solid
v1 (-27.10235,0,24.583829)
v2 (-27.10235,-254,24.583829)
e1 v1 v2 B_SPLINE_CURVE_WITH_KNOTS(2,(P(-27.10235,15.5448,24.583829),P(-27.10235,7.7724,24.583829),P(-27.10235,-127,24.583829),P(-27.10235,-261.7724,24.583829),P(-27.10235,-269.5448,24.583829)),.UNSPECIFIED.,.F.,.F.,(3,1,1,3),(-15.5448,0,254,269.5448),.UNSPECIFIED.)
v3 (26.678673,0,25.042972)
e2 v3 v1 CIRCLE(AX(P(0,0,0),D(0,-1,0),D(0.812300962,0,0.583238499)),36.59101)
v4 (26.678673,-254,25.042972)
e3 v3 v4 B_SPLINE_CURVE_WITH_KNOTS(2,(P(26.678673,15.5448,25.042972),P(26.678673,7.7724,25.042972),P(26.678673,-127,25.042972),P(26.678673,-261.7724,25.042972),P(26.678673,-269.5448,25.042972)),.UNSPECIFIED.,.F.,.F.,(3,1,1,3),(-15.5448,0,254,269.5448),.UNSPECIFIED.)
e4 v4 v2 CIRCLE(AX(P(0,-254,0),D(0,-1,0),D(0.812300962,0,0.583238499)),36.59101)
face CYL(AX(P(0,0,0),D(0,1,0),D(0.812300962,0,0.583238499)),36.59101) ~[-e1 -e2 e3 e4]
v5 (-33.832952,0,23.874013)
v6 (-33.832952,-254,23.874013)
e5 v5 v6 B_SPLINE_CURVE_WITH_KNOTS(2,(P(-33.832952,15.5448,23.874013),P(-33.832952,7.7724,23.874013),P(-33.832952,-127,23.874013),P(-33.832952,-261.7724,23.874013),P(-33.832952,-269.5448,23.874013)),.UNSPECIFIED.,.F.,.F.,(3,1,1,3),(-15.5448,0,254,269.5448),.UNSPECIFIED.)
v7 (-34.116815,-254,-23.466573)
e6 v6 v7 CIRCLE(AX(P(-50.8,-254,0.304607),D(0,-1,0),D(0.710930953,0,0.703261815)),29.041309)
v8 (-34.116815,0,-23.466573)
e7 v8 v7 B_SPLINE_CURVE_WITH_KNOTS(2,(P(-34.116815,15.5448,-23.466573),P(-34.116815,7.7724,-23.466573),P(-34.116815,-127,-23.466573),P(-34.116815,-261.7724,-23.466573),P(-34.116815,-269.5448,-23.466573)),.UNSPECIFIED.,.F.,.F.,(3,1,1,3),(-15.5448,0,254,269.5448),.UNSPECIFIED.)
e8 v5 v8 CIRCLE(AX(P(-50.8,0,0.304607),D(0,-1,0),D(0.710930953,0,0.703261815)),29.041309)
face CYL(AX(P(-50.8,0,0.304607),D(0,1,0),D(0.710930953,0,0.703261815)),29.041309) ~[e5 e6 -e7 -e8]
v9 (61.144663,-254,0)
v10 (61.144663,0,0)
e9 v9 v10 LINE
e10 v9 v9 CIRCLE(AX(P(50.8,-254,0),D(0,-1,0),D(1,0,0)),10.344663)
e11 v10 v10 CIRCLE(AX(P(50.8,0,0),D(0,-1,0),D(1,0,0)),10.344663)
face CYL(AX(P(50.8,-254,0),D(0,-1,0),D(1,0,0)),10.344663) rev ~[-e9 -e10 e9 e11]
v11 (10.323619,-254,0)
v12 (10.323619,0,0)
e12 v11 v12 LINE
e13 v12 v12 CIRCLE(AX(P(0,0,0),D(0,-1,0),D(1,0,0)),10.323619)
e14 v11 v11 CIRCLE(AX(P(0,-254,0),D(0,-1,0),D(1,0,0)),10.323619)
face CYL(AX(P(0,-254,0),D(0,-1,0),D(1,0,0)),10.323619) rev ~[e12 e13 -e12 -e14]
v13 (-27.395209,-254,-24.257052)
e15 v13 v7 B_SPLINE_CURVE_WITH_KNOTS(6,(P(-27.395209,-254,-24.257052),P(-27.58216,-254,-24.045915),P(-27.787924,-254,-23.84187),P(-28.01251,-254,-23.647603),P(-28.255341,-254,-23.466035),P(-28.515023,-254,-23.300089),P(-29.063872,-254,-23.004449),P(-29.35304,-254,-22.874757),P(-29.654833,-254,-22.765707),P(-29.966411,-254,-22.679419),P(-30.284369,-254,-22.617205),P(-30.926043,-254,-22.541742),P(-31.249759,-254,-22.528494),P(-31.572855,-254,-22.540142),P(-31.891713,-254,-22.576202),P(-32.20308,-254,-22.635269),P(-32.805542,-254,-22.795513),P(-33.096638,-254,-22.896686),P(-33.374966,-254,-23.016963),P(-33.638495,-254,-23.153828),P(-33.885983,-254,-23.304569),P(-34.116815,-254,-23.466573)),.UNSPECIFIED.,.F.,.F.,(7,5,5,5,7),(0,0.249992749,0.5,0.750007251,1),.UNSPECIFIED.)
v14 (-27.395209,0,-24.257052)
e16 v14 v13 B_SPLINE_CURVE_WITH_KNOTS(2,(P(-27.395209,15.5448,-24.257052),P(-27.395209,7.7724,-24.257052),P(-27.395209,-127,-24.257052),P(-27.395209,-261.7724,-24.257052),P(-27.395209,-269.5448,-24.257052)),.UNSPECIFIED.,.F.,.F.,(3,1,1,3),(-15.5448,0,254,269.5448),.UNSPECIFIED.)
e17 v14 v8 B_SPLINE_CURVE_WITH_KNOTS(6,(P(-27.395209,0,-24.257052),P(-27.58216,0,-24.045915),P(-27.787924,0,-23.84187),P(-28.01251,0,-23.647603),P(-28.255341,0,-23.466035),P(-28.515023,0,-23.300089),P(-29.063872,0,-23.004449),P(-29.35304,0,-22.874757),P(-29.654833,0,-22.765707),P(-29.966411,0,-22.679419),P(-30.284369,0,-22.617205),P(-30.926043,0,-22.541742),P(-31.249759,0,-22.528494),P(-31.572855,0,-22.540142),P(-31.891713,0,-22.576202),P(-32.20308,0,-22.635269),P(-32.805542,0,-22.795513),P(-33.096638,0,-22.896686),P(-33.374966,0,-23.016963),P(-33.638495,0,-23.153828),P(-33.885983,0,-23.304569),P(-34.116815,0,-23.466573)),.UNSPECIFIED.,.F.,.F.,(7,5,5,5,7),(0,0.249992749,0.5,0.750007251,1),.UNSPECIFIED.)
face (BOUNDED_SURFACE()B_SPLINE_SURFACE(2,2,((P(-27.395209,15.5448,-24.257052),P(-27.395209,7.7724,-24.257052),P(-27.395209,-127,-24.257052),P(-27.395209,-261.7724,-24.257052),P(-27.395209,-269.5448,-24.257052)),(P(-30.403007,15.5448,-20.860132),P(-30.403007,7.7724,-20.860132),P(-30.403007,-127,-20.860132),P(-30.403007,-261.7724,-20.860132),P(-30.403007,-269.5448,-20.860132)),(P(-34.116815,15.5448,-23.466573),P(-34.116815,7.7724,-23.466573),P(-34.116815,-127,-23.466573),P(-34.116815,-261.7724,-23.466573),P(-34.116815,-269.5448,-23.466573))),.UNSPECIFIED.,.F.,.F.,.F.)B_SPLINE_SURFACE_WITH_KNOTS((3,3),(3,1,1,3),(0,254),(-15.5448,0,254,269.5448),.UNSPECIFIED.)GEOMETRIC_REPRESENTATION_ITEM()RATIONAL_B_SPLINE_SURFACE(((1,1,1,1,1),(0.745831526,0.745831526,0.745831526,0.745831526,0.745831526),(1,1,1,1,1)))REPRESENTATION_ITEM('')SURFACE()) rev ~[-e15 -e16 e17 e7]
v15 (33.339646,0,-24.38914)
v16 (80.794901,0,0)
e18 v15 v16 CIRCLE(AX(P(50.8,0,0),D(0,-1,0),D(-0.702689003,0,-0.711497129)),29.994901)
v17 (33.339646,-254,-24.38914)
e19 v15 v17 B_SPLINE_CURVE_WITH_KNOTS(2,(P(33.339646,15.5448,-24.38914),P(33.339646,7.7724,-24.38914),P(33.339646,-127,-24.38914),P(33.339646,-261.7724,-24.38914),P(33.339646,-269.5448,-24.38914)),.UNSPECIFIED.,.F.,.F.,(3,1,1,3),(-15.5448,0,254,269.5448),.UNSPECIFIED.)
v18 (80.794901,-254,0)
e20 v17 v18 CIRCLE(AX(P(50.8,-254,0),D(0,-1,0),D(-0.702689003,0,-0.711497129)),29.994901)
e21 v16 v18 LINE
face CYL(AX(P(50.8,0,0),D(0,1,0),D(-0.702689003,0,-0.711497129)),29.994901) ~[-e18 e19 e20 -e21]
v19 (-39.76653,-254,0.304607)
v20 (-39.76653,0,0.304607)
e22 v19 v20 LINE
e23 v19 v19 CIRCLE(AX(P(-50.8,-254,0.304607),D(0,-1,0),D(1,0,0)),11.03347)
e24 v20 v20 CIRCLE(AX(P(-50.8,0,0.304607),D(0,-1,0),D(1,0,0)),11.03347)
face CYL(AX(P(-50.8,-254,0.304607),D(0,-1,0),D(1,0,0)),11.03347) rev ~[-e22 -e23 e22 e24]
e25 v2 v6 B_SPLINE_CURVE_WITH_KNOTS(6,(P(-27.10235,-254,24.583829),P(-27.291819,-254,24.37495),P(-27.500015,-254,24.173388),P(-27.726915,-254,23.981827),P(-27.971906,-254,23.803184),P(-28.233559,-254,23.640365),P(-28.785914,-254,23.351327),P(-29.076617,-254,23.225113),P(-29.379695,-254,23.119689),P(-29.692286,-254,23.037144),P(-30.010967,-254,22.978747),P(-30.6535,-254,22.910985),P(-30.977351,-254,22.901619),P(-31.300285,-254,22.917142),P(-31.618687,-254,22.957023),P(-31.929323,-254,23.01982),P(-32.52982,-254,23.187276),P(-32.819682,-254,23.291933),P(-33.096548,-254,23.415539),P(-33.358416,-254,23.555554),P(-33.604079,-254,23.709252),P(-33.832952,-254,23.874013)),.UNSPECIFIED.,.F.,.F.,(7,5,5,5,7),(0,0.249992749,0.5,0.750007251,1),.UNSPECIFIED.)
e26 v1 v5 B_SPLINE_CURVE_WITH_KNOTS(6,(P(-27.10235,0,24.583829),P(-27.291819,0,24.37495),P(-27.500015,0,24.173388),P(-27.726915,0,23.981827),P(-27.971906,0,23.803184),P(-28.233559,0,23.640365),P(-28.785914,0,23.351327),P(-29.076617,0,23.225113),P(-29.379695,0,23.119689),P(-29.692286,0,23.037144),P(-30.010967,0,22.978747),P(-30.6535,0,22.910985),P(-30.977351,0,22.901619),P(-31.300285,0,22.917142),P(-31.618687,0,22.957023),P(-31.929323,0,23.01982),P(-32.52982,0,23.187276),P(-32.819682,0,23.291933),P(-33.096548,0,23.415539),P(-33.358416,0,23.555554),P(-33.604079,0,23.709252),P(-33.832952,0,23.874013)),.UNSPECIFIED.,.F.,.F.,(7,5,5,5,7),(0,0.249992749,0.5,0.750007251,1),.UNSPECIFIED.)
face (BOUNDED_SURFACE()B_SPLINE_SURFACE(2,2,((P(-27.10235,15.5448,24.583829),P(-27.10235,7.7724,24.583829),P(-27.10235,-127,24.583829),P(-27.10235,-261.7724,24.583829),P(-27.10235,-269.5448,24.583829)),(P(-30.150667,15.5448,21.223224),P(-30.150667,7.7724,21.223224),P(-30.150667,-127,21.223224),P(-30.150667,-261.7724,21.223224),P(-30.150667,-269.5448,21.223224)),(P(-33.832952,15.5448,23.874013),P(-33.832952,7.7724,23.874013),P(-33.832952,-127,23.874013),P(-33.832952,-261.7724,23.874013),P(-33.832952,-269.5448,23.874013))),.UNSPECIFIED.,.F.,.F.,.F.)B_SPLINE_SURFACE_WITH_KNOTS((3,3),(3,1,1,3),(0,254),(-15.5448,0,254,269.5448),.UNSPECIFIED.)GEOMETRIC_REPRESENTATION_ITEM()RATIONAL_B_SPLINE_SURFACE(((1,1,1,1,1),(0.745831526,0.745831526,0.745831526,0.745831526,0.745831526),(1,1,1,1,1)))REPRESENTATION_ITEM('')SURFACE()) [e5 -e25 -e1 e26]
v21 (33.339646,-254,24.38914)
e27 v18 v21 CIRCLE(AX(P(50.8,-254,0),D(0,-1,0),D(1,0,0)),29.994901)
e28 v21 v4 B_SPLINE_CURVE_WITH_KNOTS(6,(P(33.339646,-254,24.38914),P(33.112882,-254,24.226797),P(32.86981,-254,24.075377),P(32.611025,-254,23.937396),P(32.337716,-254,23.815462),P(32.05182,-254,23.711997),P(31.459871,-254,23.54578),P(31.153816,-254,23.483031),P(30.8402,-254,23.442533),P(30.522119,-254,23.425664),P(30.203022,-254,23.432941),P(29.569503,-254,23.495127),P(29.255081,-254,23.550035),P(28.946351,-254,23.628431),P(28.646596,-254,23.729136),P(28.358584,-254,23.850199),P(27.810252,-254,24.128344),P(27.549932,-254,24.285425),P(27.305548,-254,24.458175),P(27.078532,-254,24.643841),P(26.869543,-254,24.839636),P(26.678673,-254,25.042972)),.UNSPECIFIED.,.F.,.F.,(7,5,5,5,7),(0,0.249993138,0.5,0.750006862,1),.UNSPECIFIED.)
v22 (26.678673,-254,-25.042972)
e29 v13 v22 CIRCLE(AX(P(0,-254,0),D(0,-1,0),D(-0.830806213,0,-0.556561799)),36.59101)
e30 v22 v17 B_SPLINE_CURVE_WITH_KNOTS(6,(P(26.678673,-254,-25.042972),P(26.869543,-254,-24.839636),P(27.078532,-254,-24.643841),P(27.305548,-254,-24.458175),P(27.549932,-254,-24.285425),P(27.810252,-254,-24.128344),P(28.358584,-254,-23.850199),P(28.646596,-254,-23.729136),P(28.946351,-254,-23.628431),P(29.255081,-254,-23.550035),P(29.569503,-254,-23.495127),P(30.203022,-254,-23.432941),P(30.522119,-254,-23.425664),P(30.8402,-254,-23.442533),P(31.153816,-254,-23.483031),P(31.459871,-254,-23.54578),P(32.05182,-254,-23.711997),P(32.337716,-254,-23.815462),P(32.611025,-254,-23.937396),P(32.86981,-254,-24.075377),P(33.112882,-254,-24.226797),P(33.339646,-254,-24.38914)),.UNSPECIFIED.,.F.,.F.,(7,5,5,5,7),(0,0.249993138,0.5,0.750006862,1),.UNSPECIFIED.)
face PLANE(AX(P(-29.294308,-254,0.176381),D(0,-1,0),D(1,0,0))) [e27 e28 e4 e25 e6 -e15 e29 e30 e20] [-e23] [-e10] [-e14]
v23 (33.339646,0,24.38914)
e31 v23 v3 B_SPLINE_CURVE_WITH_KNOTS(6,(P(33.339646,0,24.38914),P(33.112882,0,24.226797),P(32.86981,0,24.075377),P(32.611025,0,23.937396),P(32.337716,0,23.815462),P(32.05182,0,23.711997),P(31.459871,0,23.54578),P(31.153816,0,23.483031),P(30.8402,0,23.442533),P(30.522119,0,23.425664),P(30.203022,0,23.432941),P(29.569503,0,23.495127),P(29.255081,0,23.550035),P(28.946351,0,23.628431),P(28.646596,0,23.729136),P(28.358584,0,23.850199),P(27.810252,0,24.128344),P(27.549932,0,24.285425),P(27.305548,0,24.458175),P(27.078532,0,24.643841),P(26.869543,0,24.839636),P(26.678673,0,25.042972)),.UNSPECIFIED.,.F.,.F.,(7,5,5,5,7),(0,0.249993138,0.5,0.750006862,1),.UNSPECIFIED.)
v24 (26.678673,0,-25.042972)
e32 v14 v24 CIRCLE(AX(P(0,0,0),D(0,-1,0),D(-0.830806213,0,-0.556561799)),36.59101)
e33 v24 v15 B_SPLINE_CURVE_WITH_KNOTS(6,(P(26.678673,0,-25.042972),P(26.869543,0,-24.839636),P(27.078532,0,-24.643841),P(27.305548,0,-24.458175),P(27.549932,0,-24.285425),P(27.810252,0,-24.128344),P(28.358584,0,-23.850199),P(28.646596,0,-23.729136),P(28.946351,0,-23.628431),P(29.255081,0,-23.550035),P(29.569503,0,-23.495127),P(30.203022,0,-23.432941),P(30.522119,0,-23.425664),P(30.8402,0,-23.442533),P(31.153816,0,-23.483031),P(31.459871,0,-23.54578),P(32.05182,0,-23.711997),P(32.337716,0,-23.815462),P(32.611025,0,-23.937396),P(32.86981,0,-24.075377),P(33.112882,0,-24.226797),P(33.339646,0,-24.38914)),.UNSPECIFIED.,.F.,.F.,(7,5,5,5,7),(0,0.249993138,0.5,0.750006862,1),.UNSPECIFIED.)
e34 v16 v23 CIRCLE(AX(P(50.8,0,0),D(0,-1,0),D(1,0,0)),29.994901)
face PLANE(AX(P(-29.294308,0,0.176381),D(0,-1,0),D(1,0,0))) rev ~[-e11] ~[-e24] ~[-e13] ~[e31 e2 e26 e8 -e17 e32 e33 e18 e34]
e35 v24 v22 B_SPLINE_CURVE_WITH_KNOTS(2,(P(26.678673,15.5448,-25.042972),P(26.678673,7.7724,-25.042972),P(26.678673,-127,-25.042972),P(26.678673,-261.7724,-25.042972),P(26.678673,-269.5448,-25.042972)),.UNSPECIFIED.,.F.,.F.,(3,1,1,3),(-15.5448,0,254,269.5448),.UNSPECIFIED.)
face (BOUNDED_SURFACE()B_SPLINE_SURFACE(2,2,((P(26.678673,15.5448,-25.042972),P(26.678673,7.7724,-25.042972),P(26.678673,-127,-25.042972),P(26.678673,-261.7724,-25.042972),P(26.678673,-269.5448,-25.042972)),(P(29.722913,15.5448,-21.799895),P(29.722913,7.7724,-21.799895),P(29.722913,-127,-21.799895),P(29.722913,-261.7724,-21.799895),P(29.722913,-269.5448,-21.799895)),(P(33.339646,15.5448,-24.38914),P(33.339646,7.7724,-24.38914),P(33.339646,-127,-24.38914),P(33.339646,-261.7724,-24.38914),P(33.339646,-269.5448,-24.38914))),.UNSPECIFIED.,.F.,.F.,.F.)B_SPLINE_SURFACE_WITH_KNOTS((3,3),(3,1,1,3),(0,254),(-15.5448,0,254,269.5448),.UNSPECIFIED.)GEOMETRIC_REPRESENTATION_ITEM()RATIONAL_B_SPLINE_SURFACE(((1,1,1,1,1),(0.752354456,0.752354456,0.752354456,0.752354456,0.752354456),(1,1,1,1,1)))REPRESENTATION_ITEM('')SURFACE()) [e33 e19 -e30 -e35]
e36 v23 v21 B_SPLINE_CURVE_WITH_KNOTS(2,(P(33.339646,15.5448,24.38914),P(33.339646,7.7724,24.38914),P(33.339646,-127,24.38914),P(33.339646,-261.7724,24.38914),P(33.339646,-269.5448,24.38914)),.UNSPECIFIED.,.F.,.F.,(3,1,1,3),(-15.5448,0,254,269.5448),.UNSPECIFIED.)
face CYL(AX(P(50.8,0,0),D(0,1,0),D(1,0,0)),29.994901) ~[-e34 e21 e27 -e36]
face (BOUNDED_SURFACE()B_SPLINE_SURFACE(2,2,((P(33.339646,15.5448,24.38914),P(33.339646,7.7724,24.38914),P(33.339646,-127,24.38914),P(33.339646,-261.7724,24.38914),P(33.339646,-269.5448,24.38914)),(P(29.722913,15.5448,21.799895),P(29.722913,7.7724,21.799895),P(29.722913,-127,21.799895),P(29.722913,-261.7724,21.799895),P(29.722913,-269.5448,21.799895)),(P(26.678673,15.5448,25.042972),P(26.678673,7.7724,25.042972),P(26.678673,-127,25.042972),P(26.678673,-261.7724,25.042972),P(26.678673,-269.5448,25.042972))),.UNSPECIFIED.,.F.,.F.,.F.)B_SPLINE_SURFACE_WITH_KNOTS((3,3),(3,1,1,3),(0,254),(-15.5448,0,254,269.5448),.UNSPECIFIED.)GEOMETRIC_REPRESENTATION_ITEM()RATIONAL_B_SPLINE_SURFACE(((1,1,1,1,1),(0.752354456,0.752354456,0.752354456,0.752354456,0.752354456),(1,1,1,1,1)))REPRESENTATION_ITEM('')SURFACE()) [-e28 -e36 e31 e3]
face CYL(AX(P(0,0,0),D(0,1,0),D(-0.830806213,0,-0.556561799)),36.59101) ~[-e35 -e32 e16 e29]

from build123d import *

# Parameters (mm, degrees)
F1_DEPTH = 254
F2_R     = 5.08
F3_R     = 11.0334695749
F3_R_2   = 10.3236193182
F3_R_3   = 10.3446634655
F4_DEPTH = 461.264


# Not quite as in the source:
# - the program builds the solid bodies; features that only make, move or delete a surface that nothing else refers to are left out


with BuildPart() as f1:
    # F0 (on Front) → F1 (new body)
    with BuildSketch(Plane.XZ):
        with BuildLine():
            ThreePointArc((-30.4000387615, -20.3651585358), (-24.0059784619, -10.8970905515), (-21.758691331, 0.3046065976))
            ThreePointArc((-21.758691331, 0.3046065976), (-23.9392938004, 11.3454431448), (-30.1536347581, 20.7282500411))
            ThreePointArc((-30.1536347581, 20.7282500411), (-36.5903525714, 0.2194028111), (-30.4000387615, -20.3651585358))
        make_face()
        with BuildLine():
            ThreePointArc((-30.1536347581, 20.7282500411), (-23.9392938004, 11.3454431448), (-21.758691331, 0.3046065976))
            ThreePointArc((-21.758691331, 0.3046065976), (-24.0059784619, -10.8970905515), (-30.4000387615, -20.3651585358))
            ThreePointArc((-30.4000387615, -20.3651585358), (-0.593995823, -36.5861887582), (29.7229129207, -21.3412859593))
            ThreePointArc((29.7229129207, -21.3412859593), (20.8050989976, 0), (29.7229129207, 21.3412859593))
            ThreePointArc((29.7229129207, 21.3412859593), (-0.3746112446, 36.5890927095), (-30.1536347581, 20.7282500411))
        make_face()
        with BuildLine():
            ThreePointArc((-30.4000387615, -20.3651585358), (-36.5903525714, 0.2194028111), (-30.1536347581, 20.7282500411))
            ThreePointArc((-30.1536347581, 20.7282500411), (-79.8407866027, 0.4787407551), (-30.4000387615, -20.3651585358))
        make_face()
        with BuildLine():
            ThreePointArc((36.5910103562, 0), (34.8316914131, 11.2096080304), (29.7229129207, 21.3412859593))
            ThreePointArc((29.7229129207, 21.3412859593), (20.8050989976, 0), (29.7229129207, -21.3412859593))
            ThreePointArc((29.7229129207, -21.3412859593), (34.8316914131, -11.2096080304), (36.5910103562, 0))
        make_face()
        with BuildLine():
            ThreePointArc((80.7949010024, 0), (62.364794546, 27.6757947177), (29.7229129207, 21.3412859593))
            ThreePointArc((29.7229129207, 21.3412859593), (34.8316914131, 11.2096080304), (36.5910103562, 0))
            ThreePointArc((36.5910103562, 0), (34.8316914131, -11.2096080304), (29.7229129207, -21.3412859593))
            ThreePointArc((29.7229129207, -21.3412859593), (62.364794546, -27.6757947177), (80.7949010024, 0))
        make_face()
    extrude(amount=F1_DEPTH)

    # F2
    f2_edges = [f1.edges().sort_by_distance(p)[0] for p in [
        (29.722913, -127, 21.341286),
        (-30.153635, -127, 20.72825),
        (29.722913, -127, -21.341286),
        (-30.400039, -127, -20.365159),
    ]]
    fillet(f2_edges, radius=F2_R)

    # F3 (on face) → F4 (cut)
    with BuildSketch(Plane.XZ.offset(254)):
        with Locations((-50.8, 0.3046065976)):
            Circle(F3_R)
        Circle(F3_R_2)
        with Locations((50.8, 0)):
            Circle(F3_R_3)
    extrude(amount=-F4_DEPTH, mode=Mode.SUBTRACT)


solid = f1.part
